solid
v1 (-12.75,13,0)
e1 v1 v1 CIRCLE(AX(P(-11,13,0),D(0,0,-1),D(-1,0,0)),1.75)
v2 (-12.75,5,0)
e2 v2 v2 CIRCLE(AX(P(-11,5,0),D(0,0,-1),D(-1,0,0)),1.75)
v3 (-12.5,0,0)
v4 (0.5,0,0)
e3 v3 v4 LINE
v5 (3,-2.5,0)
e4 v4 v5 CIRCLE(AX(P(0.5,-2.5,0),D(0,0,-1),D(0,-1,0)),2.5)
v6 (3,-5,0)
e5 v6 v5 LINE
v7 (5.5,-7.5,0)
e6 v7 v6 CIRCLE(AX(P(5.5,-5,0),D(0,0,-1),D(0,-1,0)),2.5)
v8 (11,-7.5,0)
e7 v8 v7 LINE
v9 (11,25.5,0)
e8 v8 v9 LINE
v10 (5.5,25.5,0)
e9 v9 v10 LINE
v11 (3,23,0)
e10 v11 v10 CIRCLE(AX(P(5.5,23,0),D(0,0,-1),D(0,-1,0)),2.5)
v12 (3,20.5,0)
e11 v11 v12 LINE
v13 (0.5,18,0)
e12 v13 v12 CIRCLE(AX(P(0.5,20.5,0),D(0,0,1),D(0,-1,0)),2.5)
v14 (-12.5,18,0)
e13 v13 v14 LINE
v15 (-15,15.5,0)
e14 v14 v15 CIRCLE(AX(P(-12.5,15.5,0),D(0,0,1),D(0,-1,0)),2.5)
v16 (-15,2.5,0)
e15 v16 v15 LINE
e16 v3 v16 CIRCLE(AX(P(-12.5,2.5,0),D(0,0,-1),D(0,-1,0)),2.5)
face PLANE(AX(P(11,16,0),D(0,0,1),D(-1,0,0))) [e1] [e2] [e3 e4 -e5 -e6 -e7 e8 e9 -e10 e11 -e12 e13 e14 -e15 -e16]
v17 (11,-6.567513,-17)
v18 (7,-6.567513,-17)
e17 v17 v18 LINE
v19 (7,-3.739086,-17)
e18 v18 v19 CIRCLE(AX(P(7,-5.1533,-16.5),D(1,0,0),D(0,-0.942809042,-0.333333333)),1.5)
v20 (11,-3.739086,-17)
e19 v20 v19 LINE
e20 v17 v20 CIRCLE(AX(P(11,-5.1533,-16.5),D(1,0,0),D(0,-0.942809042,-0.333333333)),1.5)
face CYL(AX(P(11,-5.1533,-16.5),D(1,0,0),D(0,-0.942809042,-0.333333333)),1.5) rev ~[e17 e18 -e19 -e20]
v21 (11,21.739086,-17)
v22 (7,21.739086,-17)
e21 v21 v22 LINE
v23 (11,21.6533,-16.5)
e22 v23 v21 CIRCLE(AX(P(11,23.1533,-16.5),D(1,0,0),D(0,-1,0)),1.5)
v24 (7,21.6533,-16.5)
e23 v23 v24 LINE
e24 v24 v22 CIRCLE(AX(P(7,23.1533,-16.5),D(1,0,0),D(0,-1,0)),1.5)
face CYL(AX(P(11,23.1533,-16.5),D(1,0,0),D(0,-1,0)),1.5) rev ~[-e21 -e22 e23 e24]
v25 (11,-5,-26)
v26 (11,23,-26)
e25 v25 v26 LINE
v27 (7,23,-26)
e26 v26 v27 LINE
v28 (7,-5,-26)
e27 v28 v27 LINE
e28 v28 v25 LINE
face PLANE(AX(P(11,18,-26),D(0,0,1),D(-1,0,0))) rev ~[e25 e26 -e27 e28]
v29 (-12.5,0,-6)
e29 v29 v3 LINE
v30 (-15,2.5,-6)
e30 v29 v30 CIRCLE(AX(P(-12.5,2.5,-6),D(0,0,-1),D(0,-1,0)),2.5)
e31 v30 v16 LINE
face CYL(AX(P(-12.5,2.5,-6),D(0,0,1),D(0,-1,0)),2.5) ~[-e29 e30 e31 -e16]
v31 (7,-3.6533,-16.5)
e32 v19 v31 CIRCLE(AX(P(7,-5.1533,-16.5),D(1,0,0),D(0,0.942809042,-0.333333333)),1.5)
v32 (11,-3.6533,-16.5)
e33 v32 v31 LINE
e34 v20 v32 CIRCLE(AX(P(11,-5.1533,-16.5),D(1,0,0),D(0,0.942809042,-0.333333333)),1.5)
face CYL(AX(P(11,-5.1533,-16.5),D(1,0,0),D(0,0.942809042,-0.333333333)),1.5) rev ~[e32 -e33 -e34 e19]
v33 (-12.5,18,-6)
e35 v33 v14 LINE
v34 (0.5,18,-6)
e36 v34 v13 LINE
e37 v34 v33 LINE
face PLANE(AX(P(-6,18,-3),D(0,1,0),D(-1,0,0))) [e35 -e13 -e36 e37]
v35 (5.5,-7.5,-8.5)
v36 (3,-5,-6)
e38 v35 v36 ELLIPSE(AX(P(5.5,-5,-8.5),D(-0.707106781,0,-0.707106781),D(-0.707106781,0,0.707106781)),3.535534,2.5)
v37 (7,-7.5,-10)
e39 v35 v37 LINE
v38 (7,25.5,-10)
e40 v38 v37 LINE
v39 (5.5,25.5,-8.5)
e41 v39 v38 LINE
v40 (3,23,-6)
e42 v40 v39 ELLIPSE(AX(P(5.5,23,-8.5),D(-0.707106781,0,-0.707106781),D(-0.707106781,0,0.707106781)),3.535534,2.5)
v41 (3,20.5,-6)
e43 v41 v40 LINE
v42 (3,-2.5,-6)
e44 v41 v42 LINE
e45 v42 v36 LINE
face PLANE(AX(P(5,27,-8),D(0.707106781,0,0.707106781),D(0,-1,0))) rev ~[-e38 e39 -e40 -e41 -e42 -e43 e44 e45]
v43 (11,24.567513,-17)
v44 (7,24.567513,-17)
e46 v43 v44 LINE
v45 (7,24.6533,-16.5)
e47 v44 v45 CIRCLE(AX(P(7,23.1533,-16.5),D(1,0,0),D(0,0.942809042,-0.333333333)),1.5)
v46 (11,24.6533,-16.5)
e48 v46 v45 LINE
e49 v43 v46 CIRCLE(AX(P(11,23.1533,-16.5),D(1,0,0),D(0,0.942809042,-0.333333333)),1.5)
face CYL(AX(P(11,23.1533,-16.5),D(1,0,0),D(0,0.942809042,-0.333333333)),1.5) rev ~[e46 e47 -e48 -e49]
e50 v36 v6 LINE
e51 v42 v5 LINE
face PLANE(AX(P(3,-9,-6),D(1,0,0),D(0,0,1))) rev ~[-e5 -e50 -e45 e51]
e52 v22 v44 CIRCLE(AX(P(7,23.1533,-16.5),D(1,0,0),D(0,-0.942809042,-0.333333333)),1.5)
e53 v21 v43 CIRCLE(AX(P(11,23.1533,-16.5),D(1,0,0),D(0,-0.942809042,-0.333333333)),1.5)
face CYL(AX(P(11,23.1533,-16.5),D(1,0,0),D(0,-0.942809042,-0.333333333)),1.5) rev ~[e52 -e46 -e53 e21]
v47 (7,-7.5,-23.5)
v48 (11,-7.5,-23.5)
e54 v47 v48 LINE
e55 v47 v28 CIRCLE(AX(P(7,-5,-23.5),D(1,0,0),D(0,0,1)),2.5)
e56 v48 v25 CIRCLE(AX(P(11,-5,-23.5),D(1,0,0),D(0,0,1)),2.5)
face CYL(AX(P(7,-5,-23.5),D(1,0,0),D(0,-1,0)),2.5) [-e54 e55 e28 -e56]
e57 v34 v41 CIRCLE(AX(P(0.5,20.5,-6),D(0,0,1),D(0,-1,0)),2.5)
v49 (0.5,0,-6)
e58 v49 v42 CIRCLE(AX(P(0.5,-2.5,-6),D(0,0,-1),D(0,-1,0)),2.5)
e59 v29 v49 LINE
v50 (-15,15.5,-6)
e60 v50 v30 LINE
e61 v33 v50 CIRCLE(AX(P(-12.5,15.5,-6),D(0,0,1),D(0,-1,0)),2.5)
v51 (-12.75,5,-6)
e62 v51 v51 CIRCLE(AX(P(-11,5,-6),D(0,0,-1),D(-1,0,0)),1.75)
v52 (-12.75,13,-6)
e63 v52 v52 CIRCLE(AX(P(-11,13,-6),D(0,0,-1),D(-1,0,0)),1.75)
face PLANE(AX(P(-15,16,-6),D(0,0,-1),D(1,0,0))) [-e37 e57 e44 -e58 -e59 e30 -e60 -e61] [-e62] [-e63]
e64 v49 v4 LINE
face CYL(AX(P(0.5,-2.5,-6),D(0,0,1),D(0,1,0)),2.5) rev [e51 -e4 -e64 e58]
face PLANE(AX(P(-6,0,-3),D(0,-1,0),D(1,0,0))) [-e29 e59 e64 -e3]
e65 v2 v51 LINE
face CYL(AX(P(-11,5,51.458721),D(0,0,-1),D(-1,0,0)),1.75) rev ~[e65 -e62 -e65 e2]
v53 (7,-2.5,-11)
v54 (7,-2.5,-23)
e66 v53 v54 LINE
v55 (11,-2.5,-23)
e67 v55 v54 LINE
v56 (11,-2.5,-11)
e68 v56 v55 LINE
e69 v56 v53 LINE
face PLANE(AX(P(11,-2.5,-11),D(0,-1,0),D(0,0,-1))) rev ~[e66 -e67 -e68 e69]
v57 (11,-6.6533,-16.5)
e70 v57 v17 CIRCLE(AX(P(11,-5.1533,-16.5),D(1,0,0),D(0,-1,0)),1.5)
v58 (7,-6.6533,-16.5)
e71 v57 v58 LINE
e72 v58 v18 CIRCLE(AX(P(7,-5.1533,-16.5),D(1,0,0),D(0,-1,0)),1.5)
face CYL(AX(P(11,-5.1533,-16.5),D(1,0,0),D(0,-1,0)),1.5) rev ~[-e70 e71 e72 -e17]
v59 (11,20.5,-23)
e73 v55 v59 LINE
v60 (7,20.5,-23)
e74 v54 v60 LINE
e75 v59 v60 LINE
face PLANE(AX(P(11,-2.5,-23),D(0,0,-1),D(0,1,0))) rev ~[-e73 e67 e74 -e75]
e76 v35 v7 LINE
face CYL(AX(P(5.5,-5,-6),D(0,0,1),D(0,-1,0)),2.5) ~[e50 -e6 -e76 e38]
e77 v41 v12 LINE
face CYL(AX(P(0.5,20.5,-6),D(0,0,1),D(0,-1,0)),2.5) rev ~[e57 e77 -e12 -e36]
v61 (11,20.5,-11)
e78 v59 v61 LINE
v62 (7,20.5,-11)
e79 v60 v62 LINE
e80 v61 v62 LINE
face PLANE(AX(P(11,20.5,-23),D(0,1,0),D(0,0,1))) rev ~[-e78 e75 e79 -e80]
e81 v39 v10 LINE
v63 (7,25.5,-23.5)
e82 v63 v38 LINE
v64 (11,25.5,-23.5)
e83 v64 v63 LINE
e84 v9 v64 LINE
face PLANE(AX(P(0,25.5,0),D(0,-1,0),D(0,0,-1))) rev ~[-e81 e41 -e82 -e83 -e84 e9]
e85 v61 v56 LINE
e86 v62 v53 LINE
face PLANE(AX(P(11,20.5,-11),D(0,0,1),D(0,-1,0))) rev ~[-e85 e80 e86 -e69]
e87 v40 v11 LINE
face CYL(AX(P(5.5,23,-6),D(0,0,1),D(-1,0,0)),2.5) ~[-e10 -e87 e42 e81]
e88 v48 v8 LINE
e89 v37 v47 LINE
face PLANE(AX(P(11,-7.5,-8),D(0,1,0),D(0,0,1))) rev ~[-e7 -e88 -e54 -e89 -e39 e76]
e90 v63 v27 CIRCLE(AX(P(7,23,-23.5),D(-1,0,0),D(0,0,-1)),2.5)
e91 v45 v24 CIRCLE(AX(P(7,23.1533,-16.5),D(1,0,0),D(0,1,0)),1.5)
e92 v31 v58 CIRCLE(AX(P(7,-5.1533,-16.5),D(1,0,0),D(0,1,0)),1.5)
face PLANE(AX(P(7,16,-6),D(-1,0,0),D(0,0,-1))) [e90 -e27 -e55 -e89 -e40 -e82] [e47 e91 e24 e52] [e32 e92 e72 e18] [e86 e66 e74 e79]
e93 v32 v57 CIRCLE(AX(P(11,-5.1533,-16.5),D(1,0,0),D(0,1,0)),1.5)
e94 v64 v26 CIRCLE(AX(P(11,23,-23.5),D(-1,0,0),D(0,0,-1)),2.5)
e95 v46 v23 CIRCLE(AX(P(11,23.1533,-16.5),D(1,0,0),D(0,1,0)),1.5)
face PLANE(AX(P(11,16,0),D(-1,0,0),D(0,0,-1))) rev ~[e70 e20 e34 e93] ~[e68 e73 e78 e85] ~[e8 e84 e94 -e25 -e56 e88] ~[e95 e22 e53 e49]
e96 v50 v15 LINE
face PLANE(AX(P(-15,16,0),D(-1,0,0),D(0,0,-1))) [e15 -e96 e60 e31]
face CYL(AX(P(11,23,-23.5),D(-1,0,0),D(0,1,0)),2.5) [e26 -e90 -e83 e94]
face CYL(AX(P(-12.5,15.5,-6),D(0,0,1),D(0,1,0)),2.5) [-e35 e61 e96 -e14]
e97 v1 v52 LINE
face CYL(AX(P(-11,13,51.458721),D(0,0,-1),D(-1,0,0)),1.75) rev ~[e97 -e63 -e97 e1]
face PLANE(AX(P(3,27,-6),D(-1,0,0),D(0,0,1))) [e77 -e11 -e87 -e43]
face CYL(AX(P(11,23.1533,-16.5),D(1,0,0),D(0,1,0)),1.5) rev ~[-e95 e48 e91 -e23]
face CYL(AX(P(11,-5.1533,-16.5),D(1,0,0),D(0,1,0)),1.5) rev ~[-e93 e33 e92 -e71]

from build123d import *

# Parameters (mm, degrees)
F0_W      = 4
F0_H      = 18
F1_DEPTH  = 26
F0_W_2    = 7
F2_DEPTH  = 6
F3_W      = 4
F3_H      = 18
F4_DEPTH  = 15
F5_W      = 4
F5_H      = 18
F6_DEPTH  = 15
F7_W      = 11.5
F7_H      = 5.5
F7_H_2    = 6
F7_H_3    = 0.5
F8_DEPTH  = 25
F9_DEPTH  = 15
F10_DEPTH = 18
F11_DEPTH = 2
F12_DEPTH = 6
F13_DEPTH = 6
F14_DEPTH = 11
F15_W     = 9
F15_H     = 8
F16_DEPTH = 30
F18_D     = 3.5
F19_W     = 18
F19_H     = 6
F20_DEPTH = 9
F21_W     = 18
F21_H     = 6
F22_DEPTH = 9
F23_SIZE  = 4
F24_DEPTH = 1.5
F25_DEPTH = 1.5
F26_R     = 2.5


with BuildPart() as f1:
    # F0 (on Top) → F1 (new body)
    with BuildSketch(Plane.XY):
        with Locations((9, 9)):
            Rectangle(F0_W, F0_H)
    extrude(amount=-F1_DEPTH)

    # F0 (on Top) → F2 (join)
    with BuildSketch(Plane.XY):
        with Locations((3.5, 9)):
            Rectangle(F0_W_2, F0_H)
        with Locations((9, 9)):
            Rectangle(F0_W, F0_H)
    extrude(amount=-F2_DEPTH)

    # F3 (on face) → F4 (join)
    with BuildSketch(Plane.XZ):
        with Locations((9, -17)):
            Rectangle(F3_W, F3_H)
    extrude(amount=F4_DEPTH)

    # F5 (on face) → F6 (join)
    with BuildSketch(Plane(origin=(0, 18, 0), x_dir=(-1, 0, 0), z_dir=(0, 1, 0))):
        with Locations((-9, -17)):
            Rectangle(F5_W, F5_H)
    extrude(amount=F6_DEPTH)

    # F7 (on face) → F8 (cut)
    with BuildSketch(Plane.YZ.offset(11)):
        with Locations((3.25, -13.75)):
            Rectangle(F7_W, F7_H)
        with Locations((14.75, -13.75)):
            Rectangle(F7_W, F7_H)
        with BuildLine():
            Line((24.5675133947, -17), (21.7390862699, -17))
            ThreePointArc((21.7390862699, -17), (23.1532998323, -18), (24.5675133947, -17))
        make_face()
        with BuildLine():
            Line((24.6532998323, -16.5), (21.6532998323, -16.5))
            ThreePointArc((21.6532998323, -16.5), (21.6749019928, -16.7536529681), (21.7390862699, -17))
            Line((21.7390862699, -17), (24.5675133947, -17))
            ThreePointArc((24.5675133947, -17), (24.6316976718, -16.7536529681), (24.6532998323, -16.5))
        make_face()
        with BuildLine():
            ThreePointArc((24.6532998323, -16.5), (23.1532998323, -15), (21.6532998323, -16.5))
            Line((21.6532998323, -16.5), (24.6532998323, -16.5))
        make_face()
        with Locations((14.75, -20)):
            Rectangle(F7_W, F7_H_2)
        with Locations((14.75, -16.75)):
            Rectangle(F7_W, F7_H_3)
        with Locations((3.25, -20)):
            Rectangle(F7_W, F7_H_2)
        with Locations((3.25, -16.75)):
            Rectangle(F7_W, F7_H_3)
        with BuildLine():
            ThreePointArc((-3.6532998323, -16.5), (-5.1532998323, -15), (-6.6532998323, -16.5))
            Line((-6.6532998323, -16.5), (-3.6532998323, -16.5))
        make_face()
        with BuildLine():
            Line((-3.6532998323, -16.5), (-6.6532998323, -16.5))
            ThreePointArc((-6.6532998323, -16.5), (-6.6316976718, -16.7536529681), (-6.5675133947, -17))
            Line((-6.5675133947, -17), (-3.7390862699, -17))
            ThreePointArc((-3.7390862699, -17), (-3.6749019928, -16.7536529681), (-3.6532998323, -16.5))
        make_face()
        with BuildLine():
            Line((-3.7390862699, -17), (-6.5675133947, -17))
            ThreePointArc((-6.5675133947, -17), (-5.1532998323, -18), (-3.7390862699, -17))
        make_face()
    extrude(amount=-F8_DEPTH, mode=Mode.SUBTRACT)

    # F9 (add): a face of the model
    f9_faces = [f1.faces().sort_by_distance(p)[0] for p in [
        (0, 9, -3),
    ]]
    extrude(f9_faces, amount=F9_DEPTH)

    # F10 (add): a face of the model
    f10_faces = [f1.faces().sort_by_distance(p)[0] for p in [
        (-1.4634146341, 0, -3.1951219512),
    ]]
    extrude(f10_faces, amount=F10_DEPTH)

    # F11 (cut): a face of the model
    f11_faces = [f1.faces().sort_by_distance(p)[0] for p in [
        (-1.4634146341, 18, -3.1951219512),
    ]]
    extrude(f11_faces, amount=-F11_DEPTH, mode=Mode.SUBTRACT)

    # F12 (cut): a face of the model
    f12_faces = [f1.faces().sort_by_distance(p)[0] for p in [
        (9, -15, -17),
    ]]
    extrude(f12_faces, amount=-F12_DEPTH, mode=Mode.SUBTRACT)

    # F13 (cut): a face of the model
    f13_faces = [f1.faces().sort_by_distance(p)[0] for p in [
        (9, 33, -17),
    ]]
    extrude(f13_faces, amount=-F13_DEPTH, mode=Mode.SUBTRACT)

    # F14 (add): a face of the model
    f14_faces = [f1.faces().sort_by_distance(p)[0] for p in [
        (-1.4634146341, 16, -3.1951219512),
    ]]
    extrude(f14_faces, amount=F14_DEPTH)

    # F15 (on face) → F16 (cut)
    with BuildSketch(Plane.YZ.offset(11)):
        with Locations((-13.5, -4)):
            Rectangle(F15_W, F15_H)
    extrude(amount=-F16_DEPTH, mode=Mode.SUBTRACT)

    # F18 (through all)
    with Locations(Plane.XY):
        with Locations((-11, 13), (-11, 5)):
            Hole(F18_D / 2)

    # F19 (on face) → F20 (cut)
    with BuildSketch(Plane.XZ.offset(9)):
        with Locations((-6, -3)):
            Rectangle(F19_W, F19_H)
    extrude(amount=-F20_DEPTH, mode=Mode.SUBTRACT)

    # F21 (on face) → F22 (cut)
    with BuildSketch(Plane(origin=(0, 27, 0), x_dir=(-1, 0, 0), z_dir=(0, 1, 0))):
        with Locations((6, -3)):
            Rectangle(F21_W, F21_H)
    extrude(amount=-F22_DEPTH, mode=Mode.SUBTRACT)

    # F23
    f23_edges = [f1.edges().sort_by_distance(p)[0] for p in [
        (7, 9, -6),
    ]]
    chamfer(f23_edges, length=F23_SIZE)

    # F24 (cut): a face of the model
    f24_faces = [f1.faces().sort_by_distance(p)[0] for p in [
        (8.0980392157, -9, -10.9019607843),
    ]]
    extrude(f24_faces, amount=-F24_DEPTH, mode=Mode.SUBTRACT)

    # F25 (cut): a face of the model
    f25_faces = [f1.faces().sort_by_distance(p)[0] for p in [
        (8.0980392157, 27, -10.9019607843),
    ]]
    extrude(f25_faces, amount=-F25_DEPTH, mode=Mode.SUBTRACT)

    # F26
    f26_edges = [f1.edges().sort_by_distance(p)[0] for p in [
        (9, 25.5, -26),
        (3, 25.5, -3),
        (-15, 18, -3),
        (9, -7.5, -26),
        (3, -7.5, -3),
        (3, 0, -3),
        (3, 18, -3),
        (-15, 0, -3),
    ]]
    fillet(f26_edges, radius=F26_R)


solid = f1.part
